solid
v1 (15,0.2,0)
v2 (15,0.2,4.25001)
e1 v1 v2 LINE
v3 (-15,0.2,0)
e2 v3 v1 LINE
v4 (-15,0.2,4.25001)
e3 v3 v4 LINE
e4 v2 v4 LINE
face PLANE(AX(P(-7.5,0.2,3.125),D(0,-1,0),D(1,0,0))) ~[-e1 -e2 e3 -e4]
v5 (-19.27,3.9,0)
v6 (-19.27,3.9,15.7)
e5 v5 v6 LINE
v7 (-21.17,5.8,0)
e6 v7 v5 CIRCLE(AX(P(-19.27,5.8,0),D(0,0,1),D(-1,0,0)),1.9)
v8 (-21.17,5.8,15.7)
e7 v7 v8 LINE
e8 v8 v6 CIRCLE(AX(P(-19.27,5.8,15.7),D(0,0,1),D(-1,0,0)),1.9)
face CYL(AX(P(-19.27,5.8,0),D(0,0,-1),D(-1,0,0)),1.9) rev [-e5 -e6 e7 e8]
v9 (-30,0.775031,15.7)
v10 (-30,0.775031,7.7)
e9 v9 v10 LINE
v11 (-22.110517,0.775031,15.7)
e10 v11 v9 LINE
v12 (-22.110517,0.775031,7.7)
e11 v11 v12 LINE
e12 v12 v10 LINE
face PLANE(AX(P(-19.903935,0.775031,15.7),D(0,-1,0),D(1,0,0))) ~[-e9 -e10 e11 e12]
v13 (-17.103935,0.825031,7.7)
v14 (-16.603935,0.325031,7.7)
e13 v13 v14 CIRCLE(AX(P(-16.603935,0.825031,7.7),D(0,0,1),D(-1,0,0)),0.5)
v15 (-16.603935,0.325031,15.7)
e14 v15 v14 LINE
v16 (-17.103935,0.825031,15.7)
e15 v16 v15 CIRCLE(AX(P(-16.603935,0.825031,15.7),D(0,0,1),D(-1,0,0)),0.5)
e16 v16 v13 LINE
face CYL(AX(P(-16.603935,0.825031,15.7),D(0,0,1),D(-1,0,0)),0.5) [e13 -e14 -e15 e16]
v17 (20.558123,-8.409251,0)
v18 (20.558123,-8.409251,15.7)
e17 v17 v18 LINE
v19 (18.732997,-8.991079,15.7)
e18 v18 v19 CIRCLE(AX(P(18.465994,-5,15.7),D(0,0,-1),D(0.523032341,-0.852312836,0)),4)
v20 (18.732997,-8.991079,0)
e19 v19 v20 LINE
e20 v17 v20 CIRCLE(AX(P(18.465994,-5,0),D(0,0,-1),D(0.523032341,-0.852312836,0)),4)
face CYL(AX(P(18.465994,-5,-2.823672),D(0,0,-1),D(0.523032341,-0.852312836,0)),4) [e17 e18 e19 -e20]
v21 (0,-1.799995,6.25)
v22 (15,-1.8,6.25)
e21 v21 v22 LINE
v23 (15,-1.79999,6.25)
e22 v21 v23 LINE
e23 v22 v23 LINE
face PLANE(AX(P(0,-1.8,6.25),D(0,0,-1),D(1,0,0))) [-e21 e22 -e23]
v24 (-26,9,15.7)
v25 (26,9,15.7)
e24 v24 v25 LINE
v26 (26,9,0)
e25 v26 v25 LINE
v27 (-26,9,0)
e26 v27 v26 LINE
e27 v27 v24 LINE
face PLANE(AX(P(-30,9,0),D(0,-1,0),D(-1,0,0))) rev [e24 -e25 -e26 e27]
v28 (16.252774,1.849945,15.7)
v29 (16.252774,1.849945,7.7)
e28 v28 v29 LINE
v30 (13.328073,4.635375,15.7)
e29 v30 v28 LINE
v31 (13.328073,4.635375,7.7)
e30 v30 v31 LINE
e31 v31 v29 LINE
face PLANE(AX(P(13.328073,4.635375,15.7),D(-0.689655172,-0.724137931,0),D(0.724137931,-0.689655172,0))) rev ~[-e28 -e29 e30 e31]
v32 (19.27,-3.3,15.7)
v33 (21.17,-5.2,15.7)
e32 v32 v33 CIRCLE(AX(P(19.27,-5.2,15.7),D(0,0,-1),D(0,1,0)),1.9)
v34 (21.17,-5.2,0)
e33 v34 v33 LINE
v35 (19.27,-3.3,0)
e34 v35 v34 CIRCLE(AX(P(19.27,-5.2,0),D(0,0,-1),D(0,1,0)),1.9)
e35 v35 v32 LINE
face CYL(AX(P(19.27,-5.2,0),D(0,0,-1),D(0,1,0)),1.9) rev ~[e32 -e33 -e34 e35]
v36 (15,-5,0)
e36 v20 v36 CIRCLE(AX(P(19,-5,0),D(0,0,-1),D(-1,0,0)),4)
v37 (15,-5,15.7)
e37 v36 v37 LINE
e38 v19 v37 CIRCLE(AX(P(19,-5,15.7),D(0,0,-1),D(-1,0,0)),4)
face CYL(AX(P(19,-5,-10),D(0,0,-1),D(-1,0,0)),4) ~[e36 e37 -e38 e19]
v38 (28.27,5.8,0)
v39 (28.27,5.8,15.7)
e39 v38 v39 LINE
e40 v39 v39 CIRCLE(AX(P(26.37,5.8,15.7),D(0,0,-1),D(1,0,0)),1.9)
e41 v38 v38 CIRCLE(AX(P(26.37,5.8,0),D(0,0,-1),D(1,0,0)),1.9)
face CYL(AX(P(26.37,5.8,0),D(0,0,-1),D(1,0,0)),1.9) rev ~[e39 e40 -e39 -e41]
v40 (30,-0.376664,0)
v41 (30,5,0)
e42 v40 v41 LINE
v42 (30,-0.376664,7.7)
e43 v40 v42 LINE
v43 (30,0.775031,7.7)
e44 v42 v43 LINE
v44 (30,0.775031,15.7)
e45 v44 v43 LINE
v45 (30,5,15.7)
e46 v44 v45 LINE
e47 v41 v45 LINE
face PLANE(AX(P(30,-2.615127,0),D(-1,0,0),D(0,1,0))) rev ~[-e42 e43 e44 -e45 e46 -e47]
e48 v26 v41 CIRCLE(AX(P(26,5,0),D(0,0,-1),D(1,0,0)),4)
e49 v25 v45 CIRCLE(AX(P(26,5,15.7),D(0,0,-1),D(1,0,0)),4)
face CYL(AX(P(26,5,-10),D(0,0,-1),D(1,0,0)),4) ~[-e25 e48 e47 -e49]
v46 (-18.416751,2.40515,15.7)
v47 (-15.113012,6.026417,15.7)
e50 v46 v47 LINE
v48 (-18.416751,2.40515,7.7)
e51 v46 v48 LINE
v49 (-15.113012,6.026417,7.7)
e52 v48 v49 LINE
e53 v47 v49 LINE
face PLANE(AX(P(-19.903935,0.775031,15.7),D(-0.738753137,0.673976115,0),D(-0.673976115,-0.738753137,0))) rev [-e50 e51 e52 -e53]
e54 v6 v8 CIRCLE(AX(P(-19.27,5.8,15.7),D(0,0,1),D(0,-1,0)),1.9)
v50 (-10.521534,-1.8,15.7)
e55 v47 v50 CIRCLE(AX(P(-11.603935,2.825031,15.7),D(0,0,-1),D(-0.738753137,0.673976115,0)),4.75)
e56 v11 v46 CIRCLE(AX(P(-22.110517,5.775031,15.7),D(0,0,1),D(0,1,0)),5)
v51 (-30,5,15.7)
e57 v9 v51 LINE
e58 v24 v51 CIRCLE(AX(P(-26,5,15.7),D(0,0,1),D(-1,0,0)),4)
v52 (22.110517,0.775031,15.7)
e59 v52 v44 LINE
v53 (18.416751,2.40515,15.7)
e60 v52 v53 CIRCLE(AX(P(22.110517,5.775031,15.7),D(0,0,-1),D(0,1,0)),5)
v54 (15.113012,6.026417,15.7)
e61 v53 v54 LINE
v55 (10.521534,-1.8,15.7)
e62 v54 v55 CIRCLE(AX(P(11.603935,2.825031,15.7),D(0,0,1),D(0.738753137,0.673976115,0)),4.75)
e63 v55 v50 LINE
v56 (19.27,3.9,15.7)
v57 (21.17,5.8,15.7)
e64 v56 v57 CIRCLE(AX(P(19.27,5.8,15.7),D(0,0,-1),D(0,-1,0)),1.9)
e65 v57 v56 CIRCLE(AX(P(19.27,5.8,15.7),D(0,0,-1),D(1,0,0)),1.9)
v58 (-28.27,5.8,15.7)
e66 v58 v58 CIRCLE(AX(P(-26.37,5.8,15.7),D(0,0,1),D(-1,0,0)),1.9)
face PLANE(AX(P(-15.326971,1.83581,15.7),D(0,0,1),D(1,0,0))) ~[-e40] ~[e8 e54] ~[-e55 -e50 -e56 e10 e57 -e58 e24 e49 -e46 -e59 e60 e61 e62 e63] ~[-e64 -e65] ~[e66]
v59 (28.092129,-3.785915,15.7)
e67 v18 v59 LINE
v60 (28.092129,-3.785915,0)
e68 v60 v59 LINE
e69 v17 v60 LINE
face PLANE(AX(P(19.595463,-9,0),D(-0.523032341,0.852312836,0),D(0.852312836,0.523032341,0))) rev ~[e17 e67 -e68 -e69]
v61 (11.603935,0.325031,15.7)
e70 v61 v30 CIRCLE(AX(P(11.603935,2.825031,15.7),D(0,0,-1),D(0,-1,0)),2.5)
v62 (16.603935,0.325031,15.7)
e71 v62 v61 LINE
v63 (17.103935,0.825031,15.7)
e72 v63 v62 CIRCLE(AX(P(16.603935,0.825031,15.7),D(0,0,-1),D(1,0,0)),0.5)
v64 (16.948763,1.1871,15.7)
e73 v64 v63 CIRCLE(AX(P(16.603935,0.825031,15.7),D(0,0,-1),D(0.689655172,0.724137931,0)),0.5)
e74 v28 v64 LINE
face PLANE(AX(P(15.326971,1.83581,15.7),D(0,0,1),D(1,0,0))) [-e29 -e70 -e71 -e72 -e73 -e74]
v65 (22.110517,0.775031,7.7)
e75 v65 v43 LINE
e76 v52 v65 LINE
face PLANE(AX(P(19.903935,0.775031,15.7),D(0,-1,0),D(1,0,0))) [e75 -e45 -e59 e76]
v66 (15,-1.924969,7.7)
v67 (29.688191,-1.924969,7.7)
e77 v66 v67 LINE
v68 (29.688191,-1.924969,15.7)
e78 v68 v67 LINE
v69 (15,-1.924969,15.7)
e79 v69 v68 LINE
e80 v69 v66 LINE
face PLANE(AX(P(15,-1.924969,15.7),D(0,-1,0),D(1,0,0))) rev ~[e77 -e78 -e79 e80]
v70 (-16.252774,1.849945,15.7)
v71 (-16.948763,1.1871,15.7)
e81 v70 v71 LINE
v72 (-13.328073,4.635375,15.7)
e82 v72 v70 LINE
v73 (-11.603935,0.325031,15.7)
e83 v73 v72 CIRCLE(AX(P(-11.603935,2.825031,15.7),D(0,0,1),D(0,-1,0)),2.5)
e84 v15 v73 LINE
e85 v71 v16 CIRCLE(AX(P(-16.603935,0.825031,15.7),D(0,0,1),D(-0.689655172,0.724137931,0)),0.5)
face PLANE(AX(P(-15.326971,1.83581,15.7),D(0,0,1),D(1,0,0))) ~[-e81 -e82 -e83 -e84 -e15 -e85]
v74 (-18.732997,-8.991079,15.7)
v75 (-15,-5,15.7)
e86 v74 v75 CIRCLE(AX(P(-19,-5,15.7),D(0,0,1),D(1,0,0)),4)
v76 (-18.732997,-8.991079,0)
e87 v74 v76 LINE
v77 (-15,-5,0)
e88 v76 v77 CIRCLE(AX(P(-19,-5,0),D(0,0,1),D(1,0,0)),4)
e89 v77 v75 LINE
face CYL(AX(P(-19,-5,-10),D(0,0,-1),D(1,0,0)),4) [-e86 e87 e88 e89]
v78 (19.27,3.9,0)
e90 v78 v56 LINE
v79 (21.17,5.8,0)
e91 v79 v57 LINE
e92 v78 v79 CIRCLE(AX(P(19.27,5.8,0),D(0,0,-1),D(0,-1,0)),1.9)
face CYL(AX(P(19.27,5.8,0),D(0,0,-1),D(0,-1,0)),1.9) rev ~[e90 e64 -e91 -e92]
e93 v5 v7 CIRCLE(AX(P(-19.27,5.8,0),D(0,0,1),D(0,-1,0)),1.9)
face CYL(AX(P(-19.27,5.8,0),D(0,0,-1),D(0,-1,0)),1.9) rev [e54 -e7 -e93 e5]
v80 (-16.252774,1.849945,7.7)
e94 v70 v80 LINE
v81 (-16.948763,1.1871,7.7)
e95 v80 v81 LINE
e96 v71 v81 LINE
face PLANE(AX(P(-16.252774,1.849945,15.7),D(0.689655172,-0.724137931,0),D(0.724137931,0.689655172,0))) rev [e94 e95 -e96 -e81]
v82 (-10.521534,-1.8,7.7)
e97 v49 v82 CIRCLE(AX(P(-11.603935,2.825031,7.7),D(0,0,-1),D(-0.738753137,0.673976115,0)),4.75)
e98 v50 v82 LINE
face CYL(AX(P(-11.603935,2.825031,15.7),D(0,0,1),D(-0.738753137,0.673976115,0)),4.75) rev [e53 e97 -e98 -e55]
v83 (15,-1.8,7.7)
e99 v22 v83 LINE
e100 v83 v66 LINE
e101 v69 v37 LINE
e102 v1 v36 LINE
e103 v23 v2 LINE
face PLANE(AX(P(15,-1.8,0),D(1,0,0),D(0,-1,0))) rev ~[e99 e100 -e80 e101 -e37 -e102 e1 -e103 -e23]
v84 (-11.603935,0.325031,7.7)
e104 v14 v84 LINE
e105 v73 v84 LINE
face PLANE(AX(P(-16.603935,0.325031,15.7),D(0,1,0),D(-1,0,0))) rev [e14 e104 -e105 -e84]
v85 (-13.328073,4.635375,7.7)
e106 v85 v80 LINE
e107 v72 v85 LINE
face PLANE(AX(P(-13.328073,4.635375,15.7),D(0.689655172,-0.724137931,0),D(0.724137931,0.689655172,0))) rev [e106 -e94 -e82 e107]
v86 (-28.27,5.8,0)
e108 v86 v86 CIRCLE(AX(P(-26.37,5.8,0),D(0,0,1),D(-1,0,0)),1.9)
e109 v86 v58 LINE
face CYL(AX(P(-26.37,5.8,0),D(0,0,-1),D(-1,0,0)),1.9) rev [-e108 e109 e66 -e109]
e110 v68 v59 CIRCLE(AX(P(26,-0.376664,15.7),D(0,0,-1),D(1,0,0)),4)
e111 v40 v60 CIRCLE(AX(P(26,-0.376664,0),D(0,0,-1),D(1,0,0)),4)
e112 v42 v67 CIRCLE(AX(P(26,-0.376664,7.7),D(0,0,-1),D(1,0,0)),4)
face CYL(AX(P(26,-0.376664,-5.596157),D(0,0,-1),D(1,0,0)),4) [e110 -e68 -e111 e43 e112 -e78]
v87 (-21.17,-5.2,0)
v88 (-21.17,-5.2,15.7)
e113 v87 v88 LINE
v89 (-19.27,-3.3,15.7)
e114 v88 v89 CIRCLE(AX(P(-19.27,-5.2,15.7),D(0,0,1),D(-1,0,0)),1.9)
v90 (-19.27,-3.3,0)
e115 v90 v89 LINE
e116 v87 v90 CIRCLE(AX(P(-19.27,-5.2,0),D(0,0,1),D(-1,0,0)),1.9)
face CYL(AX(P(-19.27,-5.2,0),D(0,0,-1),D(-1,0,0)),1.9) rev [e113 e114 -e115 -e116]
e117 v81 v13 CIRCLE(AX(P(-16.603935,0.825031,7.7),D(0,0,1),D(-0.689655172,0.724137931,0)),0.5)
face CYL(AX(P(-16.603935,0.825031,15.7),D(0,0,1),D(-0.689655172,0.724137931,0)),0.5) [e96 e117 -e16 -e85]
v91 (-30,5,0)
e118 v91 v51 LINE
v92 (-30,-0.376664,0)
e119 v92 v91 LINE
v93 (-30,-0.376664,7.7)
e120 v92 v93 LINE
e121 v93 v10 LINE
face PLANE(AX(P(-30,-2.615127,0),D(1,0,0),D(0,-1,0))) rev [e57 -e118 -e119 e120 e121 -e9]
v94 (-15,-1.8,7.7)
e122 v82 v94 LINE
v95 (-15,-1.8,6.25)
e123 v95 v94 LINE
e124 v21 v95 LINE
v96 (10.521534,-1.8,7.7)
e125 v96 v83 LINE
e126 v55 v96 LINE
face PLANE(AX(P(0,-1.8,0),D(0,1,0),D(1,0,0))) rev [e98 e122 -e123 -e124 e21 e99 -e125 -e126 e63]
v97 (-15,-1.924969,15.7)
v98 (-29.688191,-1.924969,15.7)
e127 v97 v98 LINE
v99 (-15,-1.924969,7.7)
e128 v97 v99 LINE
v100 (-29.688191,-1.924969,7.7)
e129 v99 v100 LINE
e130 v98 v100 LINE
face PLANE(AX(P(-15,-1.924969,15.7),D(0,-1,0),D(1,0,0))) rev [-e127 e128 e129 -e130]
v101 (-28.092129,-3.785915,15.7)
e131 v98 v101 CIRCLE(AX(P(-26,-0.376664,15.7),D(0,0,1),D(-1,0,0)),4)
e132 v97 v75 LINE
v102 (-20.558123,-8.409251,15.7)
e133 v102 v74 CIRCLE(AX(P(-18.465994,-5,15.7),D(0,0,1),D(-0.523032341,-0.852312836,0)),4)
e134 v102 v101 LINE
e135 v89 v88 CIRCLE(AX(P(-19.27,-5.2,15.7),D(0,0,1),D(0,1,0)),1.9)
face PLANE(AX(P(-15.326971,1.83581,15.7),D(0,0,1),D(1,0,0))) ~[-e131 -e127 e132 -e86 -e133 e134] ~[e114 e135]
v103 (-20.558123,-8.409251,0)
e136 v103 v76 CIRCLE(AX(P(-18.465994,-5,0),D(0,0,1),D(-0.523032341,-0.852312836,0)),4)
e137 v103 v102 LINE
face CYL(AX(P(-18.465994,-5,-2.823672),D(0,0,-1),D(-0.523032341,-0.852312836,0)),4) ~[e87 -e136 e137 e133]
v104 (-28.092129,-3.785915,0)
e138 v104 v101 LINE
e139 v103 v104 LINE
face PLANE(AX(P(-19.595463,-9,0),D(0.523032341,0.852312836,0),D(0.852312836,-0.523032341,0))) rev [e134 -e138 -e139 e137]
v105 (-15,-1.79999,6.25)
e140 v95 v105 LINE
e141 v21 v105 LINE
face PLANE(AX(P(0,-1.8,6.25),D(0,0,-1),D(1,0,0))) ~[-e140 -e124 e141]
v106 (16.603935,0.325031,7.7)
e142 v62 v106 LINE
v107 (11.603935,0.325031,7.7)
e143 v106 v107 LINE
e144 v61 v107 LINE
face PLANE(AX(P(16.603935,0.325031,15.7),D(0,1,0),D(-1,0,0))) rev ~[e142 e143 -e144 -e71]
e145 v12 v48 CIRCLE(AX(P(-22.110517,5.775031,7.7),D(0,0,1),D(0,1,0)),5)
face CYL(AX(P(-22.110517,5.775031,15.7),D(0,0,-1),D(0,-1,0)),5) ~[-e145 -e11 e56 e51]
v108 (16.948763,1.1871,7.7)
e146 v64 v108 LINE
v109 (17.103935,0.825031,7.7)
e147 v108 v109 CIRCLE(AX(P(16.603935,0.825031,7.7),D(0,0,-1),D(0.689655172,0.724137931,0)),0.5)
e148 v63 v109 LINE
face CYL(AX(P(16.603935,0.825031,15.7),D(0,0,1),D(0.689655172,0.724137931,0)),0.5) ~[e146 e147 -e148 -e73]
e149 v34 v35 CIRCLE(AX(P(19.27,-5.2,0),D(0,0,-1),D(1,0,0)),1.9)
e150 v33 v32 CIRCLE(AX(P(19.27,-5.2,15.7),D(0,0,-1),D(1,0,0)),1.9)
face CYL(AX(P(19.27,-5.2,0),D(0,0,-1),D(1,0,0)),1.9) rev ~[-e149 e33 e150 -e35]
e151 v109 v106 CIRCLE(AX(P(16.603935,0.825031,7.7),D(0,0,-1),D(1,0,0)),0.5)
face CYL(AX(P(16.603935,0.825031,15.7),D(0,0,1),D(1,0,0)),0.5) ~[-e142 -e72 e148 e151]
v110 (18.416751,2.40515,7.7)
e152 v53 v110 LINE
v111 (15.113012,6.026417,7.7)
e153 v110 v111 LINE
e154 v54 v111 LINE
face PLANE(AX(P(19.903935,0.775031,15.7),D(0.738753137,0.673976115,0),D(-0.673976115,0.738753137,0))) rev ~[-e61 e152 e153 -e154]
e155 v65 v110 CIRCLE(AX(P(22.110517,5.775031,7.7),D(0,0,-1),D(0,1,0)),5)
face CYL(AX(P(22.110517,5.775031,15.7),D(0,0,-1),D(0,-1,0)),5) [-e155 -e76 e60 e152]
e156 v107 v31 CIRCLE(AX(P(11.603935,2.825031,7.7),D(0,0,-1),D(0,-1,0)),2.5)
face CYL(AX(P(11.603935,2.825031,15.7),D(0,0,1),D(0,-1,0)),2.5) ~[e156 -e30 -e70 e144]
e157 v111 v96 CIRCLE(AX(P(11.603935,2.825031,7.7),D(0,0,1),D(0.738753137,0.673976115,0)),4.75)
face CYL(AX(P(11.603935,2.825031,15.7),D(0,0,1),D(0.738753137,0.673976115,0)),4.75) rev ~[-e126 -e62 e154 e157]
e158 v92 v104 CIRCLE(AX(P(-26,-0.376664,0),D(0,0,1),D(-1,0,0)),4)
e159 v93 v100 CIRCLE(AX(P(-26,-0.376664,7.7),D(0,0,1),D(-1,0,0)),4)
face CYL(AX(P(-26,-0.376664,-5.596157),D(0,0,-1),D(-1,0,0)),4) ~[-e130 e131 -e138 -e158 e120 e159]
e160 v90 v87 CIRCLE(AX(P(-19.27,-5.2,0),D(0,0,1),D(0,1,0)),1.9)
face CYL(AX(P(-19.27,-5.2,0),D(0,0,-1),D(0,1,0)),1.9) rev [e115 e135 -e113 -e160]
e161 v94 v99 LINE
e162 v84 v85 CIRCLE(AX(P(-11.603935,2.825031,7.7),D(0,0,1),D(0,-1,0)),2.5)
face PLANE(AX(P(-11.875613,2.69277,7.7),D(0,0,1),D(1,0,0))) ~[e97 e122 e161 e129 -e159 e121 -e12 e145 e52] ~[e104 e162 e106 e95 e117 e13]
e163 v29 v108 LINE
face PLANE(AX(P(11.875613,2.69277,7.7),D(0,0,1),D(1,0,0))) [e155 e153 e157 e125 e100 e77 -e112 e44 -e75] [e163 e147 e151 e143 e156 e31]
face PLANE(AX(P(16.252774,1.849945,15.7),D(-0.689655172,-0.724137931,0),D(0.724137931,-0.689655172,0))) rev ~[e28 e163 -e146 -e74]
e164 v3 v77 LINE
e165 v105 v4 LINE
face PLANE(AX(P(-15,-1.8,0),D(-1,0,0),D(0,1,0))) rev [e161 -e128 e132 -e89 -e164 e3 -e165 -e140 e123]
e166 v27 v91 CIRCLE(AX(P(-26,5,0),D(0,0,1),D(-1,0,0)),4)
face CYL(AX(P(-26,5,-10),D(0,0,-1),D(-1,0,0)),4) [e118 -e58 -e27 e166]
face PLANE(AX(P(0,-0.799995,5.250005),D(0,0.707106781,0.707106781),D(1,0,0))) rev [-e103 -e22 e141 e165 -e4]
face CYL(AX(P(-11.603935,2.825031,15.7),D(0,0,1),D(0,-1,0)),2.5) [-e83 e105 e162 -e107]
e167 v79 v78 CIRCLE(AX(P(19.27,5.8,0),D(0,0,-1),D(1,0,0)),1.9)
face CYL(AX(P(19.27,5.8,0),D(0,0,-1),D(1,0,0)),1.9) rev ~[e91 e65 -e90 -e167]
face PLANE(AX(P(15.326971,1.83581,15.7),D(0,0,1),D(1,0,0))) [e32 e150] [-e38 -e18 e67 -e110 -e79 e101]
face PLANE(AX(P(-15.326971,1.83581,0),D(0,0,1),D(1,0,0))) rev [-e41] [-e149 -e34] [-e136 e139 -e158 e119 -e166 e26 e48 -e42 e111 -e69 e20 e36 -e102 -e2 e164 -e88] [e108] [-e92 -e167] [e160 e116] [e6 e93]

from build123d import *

# Parameters (mm, degrees)
F1_DEPTH    = 15.7
F2_W        = 10.0960650777
F2_H        = 2.7
F3_DEPTH    = 8
F4_R        = 5
F5_T1_DEPTH = 26.8923143391
F5_T3_DEPTH = 21.3473434867
F5_T5_DEPTH = 35.7
F6_W        = 15
F6_H        = 6.25
F7_DEPTH    = 2
F8_SIZE     = 1.99999


# Not quite as in the source:
# - a fillet or chamfer that OpenCascade refuses, or shapes differently, is made with other operations: its cross-section is extruded or revolved along the edge and cut away or added
# - a fillet or chamfer is up to 0.001 mm smaller than in the source, because OpenCascade refuses the exact size


with BuildPart() as f1:
    # F0 (on Top) → F1 (new body)
    with BuildSketch(Plane.XY):
        Polygon((30, 9), (0, 9), (0, -1.8), (15, -1.8), (15, -9), (19.5954625243, -9), (30, -2.6151265483), align=None)
        with BuildLine():
            ThreePointArc((21.17, -5.2), (17.9264971157, -6.5435028843), (19.27, -3.3))
            ThreePointArc((19.27, -3.3), (20.6135028843, -3.8564971157), (21.17, -5.2))
        make_face(mode=Mode.SUBTRACT)
        with BuildLine():
            ThreePointArc((19.27, 3.9), (17.9264971157, 7.1435028843), (21.17, 5.8))
            ThreePointArc((21.17, 5.8), (20.6135028843, 4.4564971157), (19.27, 3.9))
        make_face(mode=Mode.SUBTRACT)
        with BuildLine():
            ThreePointArc((24.47, 5.8), (26.37, 7.7), (28.27, 5.8))
            ThreePointArc((28.27, 5.8), (26.37, 3.9), (24.47, 5.8))
        make_face(mode=Mode.SUBTRACT)
    extrude(amount=F1_DEPTH)

    # F2 (on face) → F3 (cut)
    with BuildSketch(Plane.XY.offset(15.7)):
        with BuildLine():
            ThreePointArc((11.6039349223, 0.3250306588), (9.2827431951, 3.7535073497), (13.3280728534, 4.6353754864))
            Line((13.3280728534, 4.6353754864), (16.2527744297, 1.8499454137))
            ThreePointArc((16.2527744297, 1.8499454137), (16.328577113, 2.3348713274), (16.3539349223, 2.8250306588))
            ThreePointArc((16.3539349223, 2.8250306588), (16.0328522645, 4.5417691876), (15.1130123218, 6.0264172029))
            ThreePointArc((15.1130123218, 6.0264172029), (7.5069370658, 5.2285923001), (10.5215341623, -1.8))
            Line((10.5215341623, -1.8), (12.6863356823, -1.8))
            ThreePointArc((12.6863356823, -1.8), (14.376262754, -1.0320016711), (15.6428085277, 0.3250306588))
            Line((15.6428085277, 0.3250306588), (11.6039349223, 0.3250306588))
        make_face()
        with BuildLine():
            ThreePointArc((16.3539349223, 2.8250306588), (16.328577113, 2.3348713274), (16.2527744297, 1.8499454137))
            Line((16.2527744297, 1.8499454137), (16.9487625085, 1.1870996243))
            ThreePointArc((16.9487625085, 1.1870996243), (17.0635074373, 1.0219903081), (17.1039349223, 0.8250306588))
            ThreePointArc((17.1039349223, 0.8250306588), (16.9574883129, 0.4714772682), (16.6039349223, 0.3250306588))
            Line((16.6039349223, 0.3250306588), (15.6428085277, 0.3250306588))
            ThreePointArc((15.6428085277, 0.3250306588), (14.376262754, -1.0320016711), (12.6863356823, -1.8))
            Line((12.6863356823, -1.8), (15, -1.8))
            Line((15, -1.8), (15, -1.9249693412))
            Line((15, -1.9249693412), (19.9039349223, -1.9249693412))
            Line((19.9039349223, -1.9249693412), (19.9039349223, 0.7750306588))
            Line((19.9039349223, 0.7750306588), (15.1130123218, 6.0264172029))
            ThreePointArc((15.1130123218, 6.0264172029), (16.0328522645, 4.5417691876), (16.3539349223, 2.8250306588))
        make_face()
        with Locations((24.9519674612, -0.5749693412)):
            Rectangle(F2_W, F2_H)
    extrude(amount=-F3_DEPTH, mode=Mode.SUBTRACT)

    # F4
    f4_edges = [f1.edges().sort_by_distance(p)[0] for p in [
        (19.903935, 0.775031, 11.7),
    ]]
    fillet(f4_edges, radius=F4_R)

    # F5: fillet of radius 4 on 4 edges, made by hand

    # F5_s2 → F5_t1 (cut)
    with BuildSketch(Plane.XY.offset(-5.5961571696)):
        with BuildLine():
            ThreePointArc((30, -0.3766636805), (29.4905957559, -2.3300559271), (28.0921293656, -3.7859150232))
            Line((28.0921293656, -3.7859150232), (30, -2.6151265483))
            Line((30, -2.6151265483), (30, -0.3766636805))
        make_face()
    extrude(amount=F5_T1_DEPTH, mode=Mode.SUBTRACT)

    # F5_s4 → F5_t3 (cut)
    with BuildSketch(Plane.XY.offset(-2.8236717433)):
        with BuildLine():
            ThreePointArc((20.5581231925, -8.4092513427), (19.5529608525, -8.8494808332), (18.465993827, -9))
            Line((18.465993827, -9), (19.5954625243, -9))
            Line((19.5954625243, -9), (20.5581231925, -8.4092513427))
        make_face()
    extrude(amount=F5_T3_DEPTH, mode=Mode.SUBTRACT)

    # F5_s6 → F5_t5 (cut)
    with BuildSketch(Plane.XY.offset(-10)):
        with BuildLine():
            ThreePointArc((15, -5), (16.1715728753, -7.8284271247), (19, -9))
            Line((19, -9), (15, -9))
            Line((15, -9), (15, -5))
        make_face()
        with BuildLine():
            ThreePointArc((30, 5), (28.8284271247, 7.8284271247), (26, 9))
            Line((26, 9), (30, 9))
            Line((30, 9), (30, 5))
        make_face()
    extrude(amount=F5_T5_DEPTH, mode=Mode.SUBTRACT)

    # F6 (on face) → F7 (cut)
    with BuildSketch(Plane.XZ.offset(1.8)):
        with Locations((7.5, 3.125)):
            Rectangle(F6_W, F6_H)
    extrude(amount=-F7_DEPTH, mode=Mode.SUBTRACT)

    # F8 (size 2 in the source; OpenCascade refuses exactly that, so slightly less here)
    f8_edges = [f1.edges().sort_by_distance(p)[0] for p in [
        (7.5, 0.2, 6.25),
    ]]
    chamfer(f8_edges, length=F8_SIZE)

    # F9: F1 across plane


with BuildPart() as f1_1:
    add(f1.part)
    add(f1.part.mirror(Plane.YZ))


solid = f1_1.part
